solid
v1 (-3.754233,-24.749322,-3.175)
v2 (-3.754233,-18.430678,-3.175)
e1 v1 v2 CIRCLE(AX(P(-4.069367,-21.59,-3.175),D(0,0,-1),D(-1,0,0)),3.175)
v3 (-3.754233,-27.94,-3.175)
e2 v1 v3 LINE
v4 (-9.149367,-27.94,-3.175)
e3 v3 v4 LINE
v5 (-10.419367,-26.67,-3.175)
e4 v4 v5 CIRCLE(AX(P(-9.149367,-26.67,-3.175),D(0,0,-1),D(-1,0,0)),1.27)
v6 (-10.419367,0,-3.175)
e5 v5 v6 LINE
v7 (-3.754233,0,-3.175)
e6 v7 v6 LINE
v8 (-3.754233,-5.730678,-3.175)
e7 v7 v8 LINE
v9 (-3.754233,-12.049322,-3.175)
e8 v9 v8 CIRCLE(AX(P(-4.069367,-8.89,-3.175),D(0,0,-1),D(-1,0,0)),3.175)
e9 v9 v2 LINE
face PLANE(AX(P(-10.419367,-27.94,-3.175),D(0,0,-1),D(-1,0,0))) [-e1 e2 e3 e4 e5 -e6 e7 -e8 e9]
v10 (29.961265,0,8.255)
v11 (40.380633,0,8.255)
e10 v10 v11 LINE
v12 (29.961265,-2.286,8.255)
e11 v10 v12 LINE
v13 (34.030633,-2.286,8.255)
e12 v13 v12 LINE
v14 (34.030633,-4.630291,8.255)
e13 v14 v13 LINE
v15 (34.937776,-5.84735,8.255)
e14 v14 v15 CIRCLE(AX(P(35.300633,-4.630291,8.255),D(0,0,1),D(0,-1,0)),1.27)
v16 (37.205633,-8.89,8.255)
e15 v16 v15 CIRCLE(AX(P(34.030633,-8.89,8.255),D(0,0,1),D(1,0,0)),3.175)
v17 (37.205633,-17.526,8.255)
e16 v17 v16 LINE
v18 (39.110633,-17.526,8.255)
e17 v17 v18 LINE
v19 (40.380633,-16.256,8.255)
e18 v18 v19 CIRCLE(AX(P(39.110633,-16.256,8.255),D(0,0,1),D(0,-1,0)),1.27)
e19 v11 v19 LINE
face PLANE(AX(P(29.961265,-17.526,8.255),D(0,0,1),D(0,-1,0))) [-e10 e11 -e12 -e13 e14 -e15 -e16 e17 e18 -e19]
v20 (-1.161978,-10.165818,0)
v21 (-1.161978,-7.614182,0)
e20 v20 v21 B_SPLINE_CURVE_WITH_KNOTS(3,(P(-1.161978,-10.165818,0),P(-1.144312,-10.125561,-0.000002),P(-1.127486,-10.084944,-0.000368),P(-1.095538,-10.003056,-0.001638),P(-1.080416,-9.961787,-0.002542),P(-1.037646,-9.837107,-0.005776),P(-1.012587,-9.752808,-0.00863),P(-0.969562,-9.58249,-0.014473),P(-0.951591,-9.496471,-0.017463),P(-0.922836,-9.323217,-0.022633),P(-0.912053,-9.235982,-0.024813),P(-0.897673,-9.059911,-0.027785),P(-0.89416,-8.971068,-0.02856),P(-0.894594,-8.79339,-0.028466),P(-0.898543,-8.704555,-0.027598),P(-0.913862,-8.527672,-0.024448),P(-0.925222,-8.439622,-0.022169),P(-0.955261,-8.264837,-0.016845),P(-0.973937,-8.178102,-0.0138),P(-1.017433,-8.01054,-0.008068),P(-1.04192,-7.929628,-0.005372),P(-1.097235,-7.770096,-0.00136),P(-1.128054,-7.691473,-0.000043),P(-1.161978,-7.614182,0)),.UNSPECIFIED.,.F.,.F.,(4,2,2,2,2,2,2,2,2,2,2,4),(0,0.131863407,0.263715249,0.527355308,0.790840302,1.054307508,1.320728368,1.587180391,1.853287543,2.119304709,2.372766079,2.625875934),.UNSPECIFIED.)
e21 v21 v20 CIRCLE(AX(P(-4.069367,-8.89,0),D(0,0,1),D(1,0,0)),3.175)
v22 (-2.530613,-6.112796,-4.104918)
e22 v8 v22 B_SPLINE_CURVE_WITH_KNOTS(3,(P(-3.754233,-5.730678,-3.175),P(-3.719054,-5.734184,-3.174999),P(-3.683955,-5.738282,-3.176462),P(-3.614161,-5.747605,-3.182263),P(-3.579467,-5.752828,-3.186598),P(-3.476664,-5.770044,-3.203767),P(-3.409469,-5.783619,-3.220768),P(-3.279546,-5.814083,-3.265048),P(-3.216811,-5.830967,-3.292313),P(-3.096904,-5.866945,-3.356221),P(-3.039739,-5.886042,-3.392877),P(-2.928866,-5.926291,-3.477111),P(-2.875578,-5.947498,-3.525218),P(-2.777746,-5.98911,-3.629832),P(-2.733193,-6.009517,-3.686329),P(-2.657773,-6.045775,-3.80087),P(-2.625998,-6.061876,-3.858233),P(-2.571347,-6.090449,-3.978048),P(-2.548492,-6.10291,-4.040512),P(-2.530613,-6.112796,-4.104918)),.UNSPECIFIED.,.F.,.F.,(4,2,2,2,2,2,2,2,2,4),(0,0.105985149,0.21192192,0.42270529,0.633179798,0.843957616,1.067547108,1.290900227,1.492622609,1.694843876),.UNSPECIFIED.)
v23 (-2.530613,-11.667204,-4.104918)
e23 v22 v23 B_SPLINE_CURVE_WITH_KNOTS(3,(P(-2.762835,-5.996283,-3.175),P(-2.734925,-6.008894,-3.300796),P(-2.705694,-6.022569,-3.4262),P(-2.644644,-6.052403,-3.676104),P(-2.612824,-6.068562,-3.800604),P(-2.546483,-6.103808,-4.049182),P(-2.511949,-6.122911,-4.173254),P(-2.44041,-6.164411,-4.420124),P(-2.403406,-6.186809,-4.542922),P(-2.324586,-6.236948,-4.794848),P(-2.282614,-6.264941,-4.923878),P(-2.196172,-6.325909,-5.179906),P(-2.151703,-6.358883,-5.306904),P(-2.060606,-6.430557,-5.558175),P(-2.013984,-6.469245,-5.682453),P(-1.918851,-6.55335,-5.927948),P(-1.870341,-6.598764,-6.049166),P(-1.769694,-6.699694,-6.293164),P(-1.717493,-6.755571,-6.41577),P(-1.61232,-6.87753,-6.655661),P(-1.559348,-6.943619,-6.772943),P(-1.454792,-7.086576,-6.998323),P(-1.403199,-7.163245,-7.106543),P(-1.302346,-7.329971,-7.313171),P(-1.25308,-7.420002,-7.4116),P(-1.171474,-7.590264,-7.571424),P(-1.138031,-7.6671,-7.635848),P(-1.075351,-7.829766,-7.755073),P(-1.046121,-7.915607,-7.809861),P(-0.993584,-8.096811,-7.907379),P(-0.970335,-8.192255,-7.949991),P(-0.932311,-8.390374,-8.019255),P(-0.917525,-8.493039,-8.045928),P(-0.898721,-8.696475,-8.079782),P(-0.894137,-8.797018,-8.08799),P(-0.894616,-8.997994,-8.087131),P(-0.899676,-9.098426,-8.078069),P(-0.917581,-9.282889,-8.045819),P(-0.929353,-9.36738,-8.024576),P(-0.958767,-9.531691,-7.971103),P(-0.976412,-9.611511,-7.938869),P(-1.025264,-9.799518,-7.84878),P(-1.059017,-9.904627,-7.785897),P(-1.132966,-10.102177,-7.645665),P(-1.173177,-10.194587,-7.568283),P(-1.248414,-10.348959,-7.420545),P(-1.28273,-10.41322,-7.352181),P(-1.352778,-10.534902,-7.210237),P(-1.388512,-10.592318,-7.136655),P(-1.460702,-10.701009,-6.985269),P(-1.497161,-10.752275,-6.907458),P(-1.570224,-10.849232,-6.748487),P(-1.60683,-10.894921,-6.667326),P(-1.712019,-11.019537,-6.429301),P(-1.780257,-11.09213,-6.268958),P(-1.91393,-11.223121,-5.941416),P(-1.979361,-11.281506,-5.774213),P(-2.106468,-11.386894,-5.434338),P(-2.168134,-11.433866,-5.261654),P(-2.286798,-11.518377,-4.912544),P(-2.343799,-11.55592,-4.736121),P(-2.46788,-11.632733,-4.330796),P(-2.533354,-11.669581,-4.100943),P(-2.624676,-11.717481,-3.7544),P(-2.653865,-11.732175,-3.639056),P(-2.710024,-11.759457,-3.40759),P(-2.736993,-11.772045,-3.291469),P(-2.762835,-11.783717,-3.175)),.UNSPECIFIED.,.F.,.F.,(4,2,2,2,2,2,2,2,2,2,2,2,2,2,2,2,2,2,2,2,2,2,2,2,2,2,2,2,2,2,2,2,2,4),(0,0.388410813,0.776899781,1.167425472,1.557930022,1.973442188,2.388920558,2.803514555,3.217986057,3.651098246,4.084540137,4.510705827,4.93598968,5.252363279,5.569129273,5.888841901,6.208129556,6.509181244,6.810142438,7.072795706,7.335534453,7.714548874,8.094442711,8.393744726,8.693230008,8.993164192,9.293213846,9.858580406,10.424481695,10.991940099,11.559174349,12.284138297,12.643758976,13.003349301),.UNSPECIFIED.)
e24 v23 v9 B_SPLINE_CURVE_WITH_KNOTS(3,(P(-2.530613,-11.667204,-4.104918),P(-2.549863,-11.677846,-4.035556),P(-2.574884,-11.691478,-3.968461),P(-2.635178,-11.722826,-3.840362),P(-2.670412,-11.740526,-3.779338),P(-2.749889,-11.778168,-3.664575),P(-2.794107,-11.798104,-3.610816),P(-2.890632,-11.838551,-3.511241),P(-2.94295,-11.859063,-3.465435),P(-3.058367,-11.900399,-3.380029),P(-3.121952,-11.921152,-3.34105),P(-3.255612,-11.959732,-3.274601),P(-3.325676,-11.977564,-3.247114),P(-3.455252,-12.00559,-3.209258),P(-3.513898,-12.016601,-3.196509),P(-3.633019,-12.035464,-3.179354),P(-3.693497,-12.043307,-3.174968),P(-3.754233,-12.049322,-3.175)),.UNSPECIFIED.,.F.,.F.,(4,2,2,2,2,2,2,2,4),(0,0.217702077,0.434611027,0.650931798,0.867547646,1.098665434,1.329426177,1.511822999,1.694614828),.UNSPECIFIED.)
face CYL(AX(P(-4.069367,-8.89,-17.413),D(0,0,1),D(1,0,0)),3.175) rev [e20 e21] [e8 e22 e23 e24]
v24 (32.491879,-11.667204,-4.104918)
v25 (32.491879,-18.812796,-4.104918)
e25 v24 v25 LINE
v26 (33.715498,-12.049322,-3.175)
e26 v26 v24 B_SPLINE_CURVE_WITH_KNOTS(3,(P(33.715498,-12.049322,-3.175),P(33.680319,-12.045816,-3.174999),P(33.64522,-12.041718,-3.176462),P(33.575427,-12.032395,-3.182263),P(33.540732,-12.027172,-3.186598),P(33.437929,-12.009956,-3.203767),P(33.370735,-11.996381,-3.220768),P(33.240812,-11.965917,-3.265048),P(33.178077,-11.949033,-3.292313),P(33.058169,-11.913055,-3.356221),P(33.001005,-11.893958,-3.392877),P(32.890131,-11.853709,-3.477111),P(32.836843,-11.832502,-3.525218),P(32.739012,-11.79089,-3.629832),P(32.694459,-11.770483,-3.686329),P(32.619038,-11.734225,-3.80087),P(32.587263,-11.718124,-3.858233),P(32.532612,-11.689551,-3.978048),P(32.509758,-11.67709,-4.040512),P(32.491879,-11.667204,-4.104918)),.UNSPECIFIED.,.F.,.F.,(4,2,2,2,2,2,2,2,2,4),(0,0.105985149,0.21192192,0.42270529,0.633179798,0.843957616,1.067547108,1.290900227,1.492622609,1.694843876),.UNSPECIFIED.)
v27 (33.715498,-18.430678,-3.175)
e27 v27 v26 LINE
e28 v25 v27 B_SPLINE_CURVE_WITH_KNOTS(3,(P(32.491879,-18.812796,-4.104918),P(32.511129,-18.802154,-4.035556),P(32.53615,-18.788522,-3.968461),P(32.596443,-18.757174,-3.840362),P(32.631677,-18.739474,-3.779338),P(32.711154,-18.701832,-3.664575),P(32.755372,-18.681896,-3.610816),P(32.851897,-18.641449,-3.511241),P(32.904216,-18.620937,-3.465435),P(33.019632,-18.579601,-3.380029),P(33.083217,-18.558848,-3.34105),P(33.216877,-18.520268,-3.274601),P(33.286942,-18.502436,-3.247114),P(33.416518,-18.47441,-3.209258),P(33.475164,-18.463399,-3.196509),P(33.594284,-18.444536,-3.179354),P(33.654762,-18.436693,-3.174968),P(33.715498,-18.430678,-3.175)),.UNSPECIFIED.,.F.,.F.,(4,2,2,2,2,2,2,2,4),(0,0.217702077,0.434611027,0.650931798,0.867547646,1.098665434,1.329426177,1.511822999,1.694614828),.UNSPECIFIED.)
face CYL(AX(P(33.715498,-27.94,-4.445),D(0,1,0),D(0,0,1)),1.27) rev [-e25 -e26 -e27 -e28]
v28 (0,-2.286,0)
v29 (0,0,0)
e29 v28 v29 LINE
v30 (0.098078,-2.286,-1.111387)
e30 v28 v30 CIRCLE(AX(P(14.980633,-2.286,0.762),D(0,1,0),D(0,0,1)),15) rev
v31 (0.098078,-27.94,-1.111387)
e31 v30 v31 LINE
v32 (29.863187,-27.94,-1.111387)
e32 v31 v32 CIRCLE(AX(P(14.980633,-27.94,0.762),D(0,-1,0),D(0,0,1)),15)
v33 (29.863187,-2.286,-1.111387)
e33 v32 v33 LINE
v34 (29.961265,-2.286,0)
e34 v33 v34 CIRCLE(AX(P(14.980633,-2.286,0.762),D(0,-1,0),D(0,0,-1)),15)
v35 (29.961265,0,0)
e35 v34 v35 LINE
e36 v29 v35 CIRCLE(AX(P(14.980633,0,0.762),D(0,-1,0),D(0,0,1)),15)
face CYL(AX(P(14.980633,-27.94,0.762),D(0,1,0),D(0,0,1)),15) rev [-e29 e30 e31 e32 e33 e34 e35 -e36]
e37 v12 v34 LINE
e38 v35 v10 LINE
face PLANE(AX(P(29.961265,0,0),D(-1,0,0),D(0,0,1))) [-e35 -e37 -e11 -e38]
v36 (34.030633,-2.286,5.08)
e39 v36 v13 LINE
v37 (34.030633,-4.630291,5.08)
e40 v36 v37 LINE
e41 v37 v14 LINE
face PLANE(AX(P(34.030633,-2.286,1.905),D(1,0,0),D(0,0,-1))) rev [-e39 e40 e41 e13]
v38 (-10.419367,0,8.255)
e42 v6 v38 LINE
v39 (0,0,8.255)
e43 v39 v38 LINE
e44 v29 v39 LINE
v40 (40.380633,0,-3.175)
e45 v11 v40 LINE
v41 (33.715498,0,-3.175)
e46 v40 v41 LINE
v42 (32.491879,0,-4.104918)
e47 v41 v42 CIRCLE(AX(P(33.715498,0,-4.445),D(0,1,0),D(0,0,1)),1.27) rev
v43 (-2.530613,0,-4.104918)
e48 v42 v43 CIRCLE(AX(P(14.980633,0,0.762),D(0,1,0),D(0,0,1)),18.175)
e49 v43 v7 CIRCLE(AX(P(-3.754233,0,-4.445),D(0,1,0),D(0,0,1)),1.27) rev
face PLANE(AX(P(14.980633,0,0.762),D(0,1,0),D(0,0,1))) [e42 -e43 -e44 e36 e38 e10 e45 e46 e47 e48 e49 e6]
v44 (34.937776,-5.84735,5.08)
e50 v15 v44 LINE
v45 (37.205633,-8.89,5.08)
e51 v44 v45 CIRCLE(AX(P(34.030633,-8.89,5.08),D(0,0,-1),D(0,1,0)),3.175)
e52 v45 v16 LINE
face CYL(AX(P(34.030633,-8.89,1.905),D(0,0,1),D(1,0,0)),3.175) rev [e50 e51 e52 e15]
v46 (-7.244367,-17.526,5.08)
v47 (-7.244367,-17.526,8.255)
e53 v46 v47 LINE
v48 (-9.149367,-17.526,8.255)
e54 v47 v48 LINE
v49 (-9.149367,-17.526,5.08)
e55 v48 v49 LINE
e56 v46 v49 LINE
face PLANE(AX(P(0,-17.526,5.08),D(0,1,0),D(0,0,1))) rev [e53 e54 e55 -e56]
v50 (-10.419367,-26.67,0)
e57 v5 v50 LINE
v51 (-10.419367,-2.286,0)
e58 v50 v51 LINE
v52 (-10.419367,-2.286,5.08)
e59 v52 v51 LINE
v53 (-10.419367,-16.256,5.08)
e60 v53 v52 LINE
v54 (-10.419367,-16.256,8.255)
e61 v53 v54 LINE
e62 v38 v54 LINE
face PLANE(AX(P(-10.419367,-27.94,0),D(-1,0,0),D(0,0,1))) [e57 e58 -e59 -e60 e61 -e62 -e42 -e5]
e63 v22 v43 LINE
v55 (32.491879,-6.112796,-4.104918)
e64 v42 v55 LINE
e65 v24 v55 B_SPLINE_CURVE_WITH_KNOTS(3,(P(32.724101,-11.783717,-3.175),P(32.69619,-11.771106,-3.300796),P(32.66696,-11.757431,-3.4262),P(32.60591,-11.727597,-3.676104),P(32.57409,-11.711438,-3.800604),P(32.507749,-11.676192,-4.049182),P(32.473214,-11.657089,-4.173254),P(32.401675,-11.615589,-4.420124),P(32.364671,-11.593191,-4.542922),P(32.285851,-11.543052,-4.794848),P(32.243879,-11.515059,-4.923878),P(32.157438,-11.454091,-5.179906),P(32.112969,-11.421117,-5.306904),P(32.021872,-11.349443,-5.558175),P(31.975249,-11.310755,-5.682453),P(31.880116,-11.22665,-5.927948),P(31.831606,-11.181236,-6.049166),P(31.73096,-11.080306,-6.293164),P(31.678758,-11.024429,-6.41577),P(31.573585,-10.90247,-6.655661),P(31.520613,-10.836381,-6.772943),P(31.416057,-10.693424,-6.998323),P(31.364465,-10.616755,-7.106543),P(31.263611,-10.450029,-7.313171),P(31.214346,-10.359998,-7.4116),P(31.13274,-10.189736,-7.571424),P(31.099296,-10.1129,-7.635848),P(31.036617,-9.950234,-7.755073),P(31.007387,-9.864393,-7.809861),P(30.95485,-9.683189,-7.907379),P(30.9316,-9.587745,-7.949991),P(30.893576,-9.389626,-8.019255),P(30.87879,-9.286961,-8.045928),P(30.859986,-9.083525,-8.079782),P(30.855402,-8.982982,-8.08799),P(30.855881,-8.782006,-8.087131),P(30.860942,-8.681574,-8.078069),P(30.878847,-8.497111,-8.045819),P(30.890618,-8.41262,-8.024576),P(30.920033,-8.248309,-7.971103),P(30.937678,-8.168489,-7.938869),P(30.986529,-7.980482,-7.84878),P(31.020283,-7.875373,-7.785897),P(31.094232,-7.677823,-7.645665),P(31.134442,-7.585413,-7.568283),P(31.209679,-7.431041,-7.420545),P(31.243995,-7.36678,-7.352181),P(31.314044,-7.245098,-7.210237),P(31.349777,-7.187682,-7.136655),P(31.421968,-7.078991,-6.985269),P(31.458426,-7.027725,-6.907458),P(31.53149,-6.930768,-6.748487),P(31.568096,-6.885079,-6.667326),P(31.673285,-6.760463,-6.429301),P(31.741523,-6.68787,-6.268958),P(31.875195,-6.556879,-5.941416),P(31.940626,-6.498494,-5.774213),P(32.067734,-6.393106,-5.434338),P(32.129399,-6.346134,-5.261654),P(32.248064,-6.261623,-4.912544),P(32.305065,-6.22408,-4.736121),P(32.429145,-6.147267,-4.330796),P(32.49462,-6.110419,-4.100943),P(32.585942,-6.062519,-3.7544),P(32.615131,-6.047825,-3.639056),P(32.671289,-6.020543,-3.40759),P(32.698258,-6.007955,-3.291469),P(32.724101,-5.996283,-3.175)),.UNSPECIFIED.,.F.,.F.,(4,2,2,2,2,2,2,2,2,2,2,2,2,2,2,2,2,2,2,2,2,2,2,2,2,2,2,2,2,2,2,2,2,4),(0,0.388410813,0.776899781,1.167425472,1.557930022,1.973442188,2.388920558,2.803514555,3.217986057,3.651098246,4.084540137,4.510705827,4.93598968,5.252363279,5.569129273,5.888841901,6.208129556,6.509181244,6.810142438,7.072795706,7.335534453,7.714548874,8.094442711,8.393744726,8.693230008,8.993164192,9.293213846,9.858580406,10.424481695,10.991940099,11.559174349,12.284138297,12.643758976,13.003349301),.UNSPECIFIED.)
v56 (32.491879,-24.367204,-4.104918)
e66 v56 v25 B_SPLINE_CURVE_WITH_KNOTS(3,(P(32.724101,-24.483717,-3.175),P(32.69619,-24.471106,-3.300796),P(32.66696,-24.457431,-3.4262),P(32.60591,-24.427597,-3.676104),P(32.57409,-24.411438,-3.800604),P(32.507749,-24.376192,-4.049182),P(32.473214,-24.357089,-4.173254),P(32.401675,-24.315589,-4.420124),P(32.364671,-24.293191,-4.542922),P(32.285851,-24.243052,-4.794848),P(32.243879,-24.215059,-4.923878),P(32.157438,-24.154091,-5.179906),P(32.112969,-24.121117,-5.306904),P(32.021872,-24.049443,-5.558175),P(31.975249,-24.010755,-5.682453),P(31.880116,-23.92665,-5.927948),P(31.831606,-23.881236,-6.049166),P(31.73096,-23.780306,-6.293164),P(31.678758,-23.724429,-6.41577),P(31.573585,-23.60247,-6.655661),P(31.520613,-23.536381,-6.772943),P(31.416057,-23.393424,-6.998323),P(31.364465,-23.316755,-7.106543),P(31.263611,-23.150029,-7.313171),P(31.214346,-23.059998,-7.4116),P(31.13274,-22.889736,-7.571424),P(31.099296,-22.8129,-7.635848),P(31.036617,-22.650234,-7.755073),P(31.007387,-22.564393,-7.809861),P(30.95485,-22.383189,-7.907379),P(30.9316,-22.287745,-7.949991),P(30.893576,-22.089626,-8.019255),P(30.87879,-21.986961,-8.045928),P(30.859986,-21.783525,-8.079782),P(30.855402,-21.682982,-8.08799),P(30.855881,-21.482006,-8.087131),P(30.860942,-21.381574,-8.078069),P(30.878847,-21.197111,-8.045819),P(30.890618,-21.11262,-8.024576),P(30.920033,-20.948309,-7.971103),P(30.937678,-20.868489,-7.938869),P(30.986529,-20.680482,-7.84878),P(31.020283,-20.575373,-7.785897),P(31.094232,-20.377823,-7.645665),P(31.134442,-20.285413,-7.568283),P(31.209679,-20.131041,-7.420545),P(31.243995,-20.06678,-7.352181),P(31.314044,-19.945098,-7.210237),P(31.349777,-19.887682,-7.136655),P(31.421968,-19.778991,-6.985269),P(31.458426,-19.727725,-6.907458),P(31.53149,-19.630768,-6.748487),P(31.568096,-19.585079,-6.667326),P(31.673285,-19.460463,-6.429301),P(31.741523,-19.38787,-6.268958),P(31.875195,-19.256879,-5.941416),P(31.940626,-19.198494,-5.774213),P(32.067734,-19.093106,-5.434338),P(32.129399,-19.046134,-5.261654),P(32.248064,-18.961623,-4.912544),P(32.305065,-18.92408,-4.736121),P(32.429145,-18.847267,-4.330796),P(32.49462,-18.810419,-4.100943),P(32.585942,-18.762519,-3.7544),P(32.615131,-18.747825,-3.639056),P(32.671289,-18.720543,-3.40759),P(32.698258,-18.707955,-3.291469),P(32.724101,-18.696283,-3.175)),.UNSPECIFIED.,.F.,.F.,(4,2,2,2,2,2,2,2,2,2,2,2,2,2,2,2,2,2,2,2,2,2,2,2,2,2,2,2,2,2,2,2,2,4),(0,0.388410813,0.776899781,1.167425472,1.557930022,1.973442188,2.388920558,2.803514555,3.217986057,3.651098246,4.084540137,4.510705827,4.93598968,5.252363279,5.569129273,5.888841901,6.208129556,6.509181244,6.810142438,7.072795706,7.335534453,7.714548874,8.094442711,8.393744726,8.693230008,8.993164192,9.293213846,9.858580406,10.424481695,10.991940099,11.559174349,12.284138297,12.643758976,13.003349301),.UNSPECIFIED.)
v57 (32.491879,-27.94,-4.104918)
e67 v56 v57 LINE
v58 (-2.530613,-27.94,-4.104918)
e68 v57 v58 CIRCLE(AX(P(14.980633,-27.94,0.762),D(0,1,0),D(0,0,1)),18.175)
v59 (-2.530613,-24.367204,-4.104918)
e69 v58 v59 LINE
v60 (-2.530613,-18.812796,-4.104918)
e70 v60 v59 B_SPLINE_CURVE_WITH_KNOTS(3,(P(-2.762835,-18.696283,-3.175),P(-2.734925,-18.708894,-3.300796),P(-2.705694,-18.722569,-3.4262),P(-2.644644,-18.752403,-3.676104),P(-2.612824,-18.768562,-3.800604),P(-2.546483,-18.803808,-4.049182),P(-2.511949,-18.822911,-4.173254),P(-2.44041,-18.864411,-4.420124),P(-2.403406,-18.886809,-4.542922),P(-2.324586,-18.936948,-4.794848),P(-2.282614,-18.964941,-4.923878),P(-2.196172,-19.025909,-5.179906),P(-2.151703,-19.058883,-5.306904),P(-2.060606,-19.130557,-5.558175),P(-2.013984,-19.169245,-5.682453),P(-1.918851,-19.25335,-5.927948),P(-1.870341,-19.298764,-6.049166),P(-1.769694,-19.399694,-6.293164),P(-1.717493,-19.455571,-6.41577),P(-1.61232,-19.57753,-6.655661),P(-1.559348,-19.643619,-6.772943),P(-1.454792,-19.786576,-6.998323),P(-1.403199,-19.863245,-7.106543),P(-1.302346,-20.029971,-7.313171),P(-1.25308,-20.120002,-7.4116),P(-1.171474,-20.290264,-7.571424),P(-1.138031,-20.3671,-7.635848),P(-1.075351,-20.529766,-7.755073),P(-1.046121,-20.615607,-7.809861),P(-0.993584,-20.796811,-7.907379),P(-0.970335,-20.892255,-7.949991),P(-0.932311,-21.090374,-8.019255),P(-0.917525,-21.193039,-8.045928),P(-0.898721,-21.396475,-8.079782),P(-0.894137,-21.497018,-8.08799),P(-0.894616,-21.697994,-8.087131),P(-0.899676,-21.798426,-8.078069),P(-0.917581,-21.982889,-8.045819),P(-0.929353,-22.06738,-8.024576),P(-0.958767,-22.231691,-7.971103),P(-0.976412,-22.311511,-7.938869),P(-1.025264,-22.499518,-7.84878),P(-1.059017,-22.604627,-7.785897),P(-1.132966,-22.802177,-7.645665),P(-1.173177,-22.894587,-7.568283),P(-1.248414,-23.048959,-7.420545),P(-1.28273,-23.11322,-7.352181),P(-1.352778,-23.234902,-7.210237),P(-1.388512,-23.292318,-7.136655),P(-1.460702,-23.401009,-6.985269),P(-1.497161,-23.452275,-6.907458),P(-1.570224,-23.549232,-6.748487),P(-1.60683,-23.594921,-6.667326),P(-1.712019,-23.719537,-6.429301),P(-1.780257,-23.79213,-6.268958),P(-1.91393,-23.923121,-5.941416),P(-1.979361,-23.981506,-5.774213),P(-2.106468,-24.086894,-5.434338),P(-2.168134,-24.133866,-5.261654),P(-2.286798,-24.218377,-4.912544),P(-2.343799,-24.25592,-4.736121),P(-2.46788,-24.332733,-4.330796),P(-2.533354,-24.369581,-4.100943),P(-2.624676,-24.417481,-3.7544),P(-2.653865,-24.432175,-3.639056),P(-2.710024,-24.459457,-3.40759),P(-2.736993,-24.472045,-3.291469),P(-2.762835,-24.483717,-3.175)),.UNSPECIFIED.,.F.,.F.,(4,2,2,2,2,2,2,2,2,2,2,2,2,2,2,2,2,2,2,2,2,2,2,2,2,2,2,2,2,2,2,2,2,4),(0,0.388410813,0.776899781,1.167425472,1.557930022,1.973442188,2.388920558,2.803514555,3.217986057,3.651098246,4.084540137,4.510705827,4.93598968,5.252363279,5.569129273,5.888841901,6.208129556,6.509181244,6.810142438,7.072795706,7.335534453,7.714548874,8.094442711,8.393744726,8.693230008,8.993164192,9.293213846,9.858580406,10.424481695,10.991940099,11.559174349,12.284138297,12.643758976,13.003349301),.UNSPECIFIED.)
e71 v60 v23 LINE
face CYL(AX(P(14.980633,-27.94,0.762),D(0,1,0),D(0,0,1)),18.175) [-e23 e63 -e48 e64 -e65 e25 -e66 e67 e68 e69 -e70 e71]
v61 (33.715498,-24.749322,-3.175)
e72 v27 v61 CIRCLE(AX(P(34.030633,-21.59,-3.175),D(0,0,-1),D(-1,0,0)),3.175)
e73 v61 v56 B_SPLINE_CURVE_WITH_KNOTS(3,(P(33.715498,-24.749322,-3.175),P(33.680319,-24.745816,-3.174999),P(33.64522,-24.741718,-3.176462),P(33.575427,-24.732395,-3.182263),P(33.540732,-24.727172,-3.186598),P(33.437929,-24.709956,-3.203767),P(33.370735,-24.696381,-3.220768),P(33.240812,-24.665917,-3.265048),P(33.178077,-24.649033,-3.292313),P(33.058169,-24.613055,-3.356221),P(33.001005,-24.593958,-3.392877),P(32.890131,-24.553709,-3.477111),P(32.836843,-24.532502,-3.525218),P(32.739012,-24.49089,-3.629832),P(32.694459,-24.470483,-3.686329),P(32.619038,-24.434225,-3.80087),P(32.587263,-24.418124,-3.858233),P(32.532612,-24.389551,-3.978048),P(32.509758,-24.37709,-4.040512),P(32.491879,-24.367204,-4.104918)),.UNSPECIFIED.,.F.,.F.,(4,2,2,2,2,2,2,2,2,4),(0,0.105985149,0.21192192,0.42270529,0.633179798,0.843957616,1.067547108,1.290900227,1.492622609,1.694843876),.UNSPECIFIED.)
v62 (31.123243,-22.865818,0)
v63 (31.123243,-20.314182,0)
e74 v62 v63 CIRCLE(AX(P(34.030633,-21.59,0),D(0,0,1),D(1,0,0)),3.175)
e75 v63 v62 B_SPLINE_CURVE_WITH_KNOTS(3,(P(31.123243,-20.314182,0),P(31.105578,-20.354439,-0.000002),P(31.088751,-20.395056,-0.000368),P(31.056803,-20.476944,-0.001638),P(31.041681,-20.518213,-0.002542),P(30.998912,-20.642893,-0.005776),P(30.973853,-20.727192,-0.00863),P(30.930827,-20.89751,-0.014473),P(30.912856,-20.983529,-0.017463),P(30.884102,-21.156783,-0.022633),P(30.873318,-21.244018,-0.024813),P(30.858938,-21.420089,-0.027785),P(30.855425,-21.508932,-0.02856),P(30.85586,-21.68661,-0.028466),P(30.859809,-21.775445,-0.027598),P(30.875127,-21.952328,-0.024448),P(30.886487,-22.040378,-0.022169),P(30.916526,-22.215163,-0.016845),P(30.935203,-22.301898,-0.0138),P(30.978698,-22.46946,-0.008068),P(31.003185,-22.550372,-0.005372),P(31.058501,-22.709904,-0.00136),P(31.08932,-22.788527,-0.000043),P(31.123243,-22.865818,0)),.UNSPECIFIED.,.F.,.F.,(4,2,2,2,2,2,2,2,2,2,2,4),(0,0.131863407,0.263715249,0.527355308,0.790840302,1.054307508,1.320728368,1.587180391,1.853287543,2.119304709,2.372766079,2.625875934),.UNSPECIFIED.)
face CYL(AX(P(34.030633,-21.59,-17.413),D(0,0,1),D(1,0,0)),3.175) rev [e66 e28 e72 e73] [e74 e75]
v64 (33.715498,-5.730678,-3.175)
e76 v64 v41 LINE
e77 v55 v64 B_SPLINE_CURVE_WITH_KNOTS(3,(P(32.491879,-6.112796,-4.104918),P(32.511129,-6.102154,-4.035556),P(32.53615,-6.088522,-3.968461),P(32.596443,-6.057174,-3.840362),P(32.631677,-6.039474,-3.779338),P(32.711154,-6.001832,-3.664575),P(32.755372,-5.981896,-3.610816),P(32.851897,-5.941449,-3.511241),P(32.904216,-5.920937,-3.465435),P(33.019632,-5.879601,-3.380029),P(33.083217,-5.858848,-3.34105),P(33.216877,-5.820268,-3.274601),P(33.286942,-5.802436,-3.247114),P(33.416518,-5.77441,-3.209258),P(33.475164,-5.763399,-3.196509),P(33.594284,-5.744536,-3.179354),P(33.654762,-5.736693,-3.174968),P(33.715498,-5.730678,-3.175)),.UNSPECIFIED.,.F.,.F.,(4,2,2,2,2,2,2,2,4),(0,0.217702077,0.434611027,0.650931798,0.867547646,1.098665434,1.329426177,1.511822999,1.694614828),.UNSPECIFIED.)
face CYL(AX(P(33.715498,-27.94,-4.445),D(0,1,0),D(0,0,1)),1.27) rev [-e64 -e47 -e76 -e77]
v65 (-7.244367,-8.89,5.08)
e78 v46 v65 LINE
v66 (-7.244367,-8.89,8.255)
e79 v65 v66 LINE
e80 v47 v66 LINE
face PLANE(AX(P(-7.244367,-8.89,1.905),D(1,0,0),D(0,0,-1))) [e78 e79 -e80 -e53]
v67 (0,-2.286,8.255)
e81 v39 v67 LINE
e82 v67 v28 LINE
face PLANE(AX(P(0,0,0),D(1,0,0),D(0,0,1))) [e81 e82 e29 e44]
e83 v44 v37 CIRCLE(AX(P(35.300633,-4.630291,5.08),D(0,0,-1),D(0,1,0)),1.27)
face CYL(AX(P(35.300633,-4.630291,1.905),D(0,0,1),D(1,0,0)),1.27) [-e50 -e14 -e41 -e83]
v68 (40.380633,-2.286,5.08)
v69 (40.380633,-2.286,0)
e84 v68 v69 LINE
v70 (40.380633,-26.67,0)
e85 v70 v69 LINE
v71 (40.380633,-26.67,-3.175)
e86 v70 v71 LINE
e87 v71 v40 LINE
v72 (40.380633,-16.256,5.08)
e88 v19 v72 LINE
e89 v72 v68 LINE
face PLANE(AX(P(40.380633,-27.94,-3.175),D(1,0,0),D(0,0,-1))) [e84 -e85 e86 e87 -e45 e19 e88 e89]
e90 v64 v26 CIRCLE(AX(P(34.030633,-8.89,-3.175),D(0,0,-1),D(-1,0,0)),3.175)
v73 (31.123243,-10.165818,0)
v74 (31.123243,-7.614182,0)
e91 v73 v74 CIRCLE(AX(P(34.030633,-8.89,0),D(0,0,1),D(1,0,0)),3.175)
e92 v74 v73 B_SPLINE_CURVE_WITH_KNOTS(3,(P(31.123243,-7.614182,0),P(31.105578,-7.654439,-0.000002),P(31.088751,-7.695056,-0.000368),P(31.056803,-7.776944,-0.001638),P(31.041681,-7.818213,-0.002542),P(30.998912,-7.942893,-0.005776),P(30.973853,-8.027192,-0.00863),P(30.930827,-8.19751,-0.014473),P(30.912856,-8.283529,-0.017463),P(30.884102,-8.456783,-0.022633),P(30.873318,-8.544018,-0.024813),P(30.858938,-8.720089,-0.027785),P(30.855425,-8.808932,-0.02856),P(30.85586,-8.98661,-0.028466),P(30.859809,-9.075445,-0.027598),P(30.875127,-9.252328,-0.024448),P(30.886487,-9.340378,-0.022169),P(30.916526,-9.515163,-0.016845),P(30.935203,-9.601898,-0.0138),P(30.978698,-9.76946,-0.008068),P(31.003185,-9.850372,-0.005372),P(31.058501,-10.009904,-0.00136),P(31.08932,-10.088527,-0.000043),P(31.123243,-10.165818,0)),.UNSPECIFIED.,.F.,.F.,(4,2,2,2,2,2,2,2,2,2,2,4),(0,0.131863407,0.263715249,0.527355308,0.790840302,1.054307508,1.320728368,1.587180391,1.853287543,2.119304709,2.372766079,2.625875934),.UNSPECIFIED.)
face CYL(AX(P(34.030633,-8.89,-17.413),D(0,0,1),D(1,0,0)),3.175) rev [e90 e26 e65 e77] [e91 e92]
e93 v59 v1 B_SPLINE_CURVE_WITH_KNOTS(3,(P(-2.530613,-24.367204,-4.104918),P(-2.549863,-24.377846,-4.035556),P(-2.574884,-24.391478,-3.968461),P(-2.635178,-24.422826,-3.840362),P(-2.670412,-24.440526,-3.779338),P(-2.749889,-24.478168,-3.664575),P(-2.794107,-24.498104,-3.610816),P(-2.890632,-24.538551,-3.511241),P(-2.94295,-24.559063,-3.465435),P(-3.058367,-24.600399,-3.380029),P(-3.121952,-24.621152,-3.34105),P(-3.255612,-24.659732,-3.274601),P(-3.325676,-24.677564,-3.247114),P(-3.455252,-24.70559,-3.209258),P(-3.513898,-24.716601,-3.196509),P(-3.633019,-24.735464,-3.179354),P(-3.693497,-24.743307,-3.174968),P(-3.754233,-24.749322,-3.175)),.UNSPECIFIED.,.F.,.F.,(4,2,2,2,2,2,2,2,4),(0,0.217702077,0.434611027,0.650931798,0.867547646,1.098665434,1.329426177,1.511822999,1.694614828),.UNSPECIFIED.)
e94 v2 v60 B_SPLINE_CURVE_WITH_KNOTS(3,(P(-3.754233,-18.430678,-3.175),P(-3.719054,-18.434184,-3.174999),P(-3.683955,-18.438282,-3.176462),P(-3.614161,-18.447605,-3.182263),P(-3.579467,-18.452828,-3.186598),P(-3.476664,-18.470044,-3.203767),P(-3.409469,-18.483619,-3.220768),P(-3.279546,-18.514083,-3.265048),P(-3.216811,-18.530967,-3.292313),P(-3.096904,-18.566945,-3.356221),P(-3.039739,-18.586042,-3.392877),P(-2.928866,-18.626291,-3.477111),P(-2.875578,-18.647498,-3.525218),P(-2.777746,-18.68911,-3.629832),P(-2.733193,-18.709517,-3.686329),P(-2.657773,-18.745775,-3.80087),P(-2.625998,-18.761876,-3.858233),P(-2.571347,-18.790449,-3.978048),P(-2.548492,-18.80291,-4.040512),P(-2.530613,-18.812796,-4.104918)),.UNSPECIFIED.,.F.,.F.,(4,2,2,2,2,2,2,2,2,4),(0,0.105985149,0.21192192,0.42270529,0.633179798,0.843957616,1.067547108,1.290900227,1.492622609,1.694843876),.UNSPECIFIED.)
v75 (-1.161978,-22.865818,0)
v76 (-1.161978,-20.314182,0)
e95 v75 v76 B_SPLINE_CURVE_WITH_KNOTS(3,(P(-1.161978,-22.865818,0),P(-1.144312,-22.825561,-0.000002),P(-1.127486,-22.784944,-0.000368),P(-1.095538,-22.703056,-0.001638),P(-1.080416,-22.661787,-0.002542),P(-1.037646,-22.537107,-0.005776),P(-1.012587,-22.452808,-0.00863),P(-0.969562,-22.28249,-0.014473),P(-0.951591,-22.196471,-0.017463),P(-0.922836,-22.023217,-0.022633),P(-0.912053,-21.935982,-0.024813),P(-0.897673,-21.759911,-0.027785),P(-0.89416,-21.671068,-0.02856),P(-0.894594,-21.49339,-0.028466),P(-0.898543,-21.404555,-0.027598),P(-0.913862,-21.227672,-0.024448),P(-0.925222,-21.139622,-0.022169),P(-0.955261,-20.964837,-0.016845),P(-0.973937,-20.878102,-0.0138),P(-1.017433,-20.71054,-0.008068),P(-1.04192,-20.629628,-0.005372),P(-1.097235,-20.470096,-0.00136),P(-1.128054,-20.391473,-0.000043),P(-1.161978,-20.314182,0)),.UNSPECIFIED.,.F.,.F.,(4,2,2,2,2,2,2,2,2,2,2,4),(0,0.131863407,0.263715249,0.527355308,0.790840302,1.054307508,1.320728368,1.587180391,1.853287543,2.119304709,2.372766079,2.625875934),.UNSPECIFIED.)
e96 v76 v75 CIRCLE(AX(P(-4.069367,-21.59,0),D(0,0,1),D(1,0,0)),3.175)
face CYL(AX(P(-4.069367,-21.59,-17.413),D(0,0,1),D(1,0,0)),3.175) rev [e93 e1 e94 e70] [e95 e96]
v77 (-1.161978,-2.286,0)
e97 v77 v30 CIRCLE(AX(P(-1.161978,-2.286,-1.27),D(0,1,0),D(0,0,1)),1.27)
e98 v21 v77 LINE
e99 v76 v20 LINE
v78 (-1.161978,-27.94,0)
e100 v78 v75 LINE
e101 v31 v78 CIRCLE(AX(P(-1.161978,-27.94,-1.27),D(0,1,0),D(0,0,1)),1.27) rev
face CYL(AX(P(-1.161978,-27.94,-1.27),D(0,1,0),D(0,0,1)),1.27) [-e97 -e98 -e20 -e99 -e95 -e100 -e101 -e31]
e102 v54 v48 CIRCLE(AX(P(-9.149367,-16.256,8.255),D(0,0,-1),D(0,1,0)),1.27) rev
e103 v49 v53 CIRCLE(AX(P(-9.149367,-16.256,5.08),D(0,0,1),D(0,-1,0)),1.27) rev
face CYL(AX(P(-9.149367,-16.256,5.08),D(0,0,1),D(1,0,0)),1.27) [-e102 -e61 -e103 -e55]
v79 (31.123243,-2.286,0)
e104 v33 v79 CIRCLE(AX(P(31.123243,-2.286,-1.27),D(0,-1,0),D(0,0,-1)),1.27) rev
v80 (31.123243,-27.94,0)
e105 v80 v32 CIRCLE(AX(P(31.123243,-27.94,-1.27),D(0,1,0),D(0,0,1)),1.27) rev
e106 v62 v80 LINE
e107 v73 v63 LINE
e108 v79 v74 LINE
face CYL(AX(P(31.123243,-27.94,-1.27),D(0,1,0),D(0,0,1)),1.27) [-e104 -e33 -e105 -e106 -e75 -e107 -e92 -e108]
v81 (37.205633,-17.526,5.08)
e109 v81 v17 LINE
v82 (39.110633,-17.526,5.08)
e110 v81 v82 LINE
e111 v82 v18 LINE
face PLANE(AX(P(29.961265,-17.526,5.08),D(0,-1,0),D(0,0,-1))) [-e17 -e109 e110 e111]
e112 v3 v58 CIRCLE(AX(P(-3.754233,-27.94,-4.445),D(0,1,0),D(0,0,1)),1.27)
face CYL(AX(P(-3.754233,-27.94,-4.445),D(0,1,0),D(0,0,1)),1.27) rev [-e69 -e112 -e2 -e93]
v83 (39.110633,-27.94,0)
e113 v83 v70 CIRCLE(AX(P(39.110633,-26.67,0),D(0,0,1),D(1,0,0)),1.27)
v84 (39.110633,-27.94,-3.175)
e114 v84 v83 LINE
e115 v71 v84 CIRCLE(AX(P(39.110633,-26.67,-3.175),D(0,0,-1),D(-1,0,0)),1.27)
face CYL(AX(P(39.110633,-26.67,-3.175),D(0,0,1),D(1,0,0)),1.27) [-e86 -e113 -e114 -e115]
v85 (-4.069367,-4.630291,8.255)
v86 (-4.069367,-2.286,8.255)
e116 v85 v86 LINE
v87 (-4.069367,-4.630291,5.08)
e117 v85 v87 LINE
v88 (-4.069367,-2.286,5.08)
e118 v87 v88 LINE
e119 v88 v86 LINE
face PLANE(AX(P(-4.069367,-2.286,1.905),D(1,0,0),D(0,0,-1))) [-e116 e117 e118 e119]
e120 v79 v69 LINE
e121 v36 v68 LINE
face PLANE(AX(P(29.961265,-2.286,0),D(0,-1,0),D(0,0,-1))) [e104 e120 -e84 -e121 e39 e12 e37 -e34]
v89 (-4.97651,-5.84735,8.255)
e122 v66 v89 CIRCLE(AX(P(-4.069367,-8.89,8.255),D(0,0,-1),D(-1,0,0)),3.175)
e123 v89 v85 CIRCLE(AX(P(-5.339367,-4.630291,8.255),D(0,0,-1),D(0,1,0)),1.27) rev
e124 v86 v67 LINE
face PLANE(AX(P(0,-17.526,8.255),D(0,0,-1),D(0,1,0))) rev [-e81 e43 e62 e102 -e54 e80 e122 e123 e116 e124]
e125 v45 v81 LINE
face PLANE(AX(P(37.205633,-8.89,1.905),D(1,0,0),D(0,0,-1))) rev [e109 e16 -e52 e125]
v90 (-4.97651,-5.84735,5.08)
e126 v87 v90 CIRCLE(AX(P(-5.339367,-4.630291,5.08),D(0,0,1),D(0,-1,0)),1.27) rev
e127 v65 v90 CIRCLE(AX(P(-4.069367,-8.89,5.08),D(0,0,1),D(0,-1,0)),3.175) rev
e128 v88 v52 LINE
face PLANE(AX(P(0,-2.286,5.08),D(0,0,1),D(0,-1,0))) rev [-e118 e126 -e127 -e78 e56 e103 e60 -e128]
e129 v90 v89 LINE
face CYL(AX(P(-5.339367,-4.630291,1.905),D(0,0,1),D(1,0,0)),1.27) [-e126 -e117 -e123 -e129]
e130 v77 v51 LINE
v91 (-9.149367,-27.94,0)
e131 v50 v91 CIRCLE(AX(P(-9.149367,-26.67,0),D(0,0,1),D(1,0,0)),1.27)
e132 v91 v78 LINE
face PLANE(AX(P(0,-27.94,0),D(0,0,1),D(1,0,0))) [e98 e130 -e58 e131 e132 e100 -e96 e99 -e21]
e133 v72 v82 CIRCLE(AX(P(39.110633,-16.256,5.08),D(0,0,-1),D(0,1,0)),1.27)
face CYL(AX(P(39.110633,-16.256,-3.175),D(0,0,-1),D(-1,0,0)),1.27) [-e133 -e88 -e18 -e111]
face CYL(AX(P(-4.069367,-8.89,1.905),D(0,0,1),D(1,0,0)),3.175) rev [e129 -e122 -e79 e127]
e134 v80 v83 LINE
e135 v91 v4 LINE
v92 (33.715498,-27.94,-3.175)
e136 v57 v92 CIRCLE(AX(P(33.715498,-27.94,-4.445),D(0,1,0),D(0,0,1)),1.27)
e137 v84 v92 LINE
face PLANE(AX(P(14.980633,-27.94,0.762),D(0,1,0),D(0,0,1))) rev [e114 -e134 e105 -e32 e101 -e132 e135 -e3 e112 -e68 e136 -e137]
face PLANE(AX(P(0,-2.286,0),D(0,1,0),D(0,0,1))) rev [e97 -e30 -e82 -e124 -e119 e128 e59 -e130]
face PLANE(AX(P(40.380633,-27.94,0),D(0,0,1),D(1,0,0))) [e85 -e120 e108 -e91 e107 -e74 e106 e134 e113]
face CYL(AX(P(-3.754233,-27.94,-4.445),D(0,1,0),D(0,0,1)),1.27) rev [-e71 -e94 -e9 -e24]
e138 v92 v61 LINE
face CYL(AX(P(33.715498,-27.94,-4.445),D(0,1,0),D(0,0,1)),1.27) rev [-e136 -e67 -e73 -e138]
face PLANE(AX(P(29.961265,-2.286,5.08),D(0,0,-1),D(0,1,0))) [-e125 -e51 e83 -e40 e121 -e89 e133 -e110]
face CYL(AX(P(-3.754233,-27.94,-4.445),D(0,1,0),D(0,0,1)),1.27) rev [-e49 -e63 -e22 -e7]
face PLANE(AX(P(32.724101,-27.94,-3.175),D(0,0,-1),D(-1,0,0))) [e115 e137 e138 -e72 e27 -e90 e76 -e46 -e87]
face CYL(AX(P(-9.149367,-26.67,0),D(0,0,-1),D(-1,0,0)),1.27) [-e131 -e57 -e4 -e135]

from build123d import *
from OCP.BRepAlgoAPI import BRepAlgoAPI_Cut
from OCP.TopTools import TopTools_ListOfShape

# Parameters (mm, degrees)
BOSS_EXTRUDE1_DEPTH = 27.94
SKETCH3_R           = 3.175
CUT_EXTRUDE1_DEPTH  = 53.100399864
BOSS_EXTRUDE2_START = -10.419367
BOSS_EXTRUDE2_DEPTH = 10.419367
CUT_EXTRUDE2_DEPTH  = 6.35
FILLET1_R           = 1.27


with BuildPart() as part:
    # Sketch2 → Boss-Extrude1 (new body)
    with BuildSketch(Plane(origin=(0, 0, 0), x_dir=(1, 0, 0), z_dir=(0, 1, 0))):
        with BuildLine():
            Line((0, 0), (-10.419367303, 0))
            Line((-10.419367303, 0), (-10.419367303, 3.175))
            Line((-10.419367303, 3.175), (-2.762835284, 3.175))
            ThreePointArc((-2.762835284, 3.175), (14.980632697, 17.413), (32.724100678, 3.175))
            Line((32.724100678, 3.175), (40.380632697, 3.175))
            Line((40.380632697, 3.175), (40.380632697, 0))
            Line((40.380632697, 0), (29.961265394, 0))
            ThreePointArc((29.961265394, 0), (14.980632697, 14.238), (0, 0))
        make_face()
    extrude(amount=-BOSS_EXTRUDE1_DEPTH)

    # Sketch3 → Cut-Extrude1 (cut, through all)
    with BuildSketch(Plane.XY):
        with Locations((-4.069367303, -8.89)):
            Circle(SKETCH3_R)
        with Locations((34.030632697, -8.89)):
            Circle(SKETCH3_R)
        with Locations((-4.069367303, -21.59)):
            Circle(SKETCH3_R)
        with Locations((34.030632697, -21.59)):
            Circle(SKETCH3_R)
    extrude(amount=-CUT_EXTRUDE1_DEPTH, mode=Mode.SUBTRACT)

    # Sketch4 → Boss-Extrude2 (add)
    with BuildSketch(Plane(origin=(40.380632697, 0, 0), x_dir=(0, 0, -1), z_dir=(1, 0, 0)).offset(BOSS_EXTRUDE2_START)):
        Polygon((-5.08, -17.526), (-8.255, -17.526), (-8.255, 0), (0, 0), (0, -2.286), (-5.08, -2.286), align=None)
    boss_extrude2 = extrude(amount=BOSS_EXTRUDE2_DEPTH)


with BuildPart() as cut_extrude2_tool:
    # Sketch5 → Cut-Extrude2 (new body)
    with BuildSketch(Plane.XY.offset(8.255)):
        with BuildLine():
            Line((37.205632697, -8.89), (37.205632697, -17.526))
            Line((37.205632697, -17.526), (29.961265394, -17.526))
            Line((29.961265394, -17.526), (29.961265394, -2.286))
            Line((29.961265394, -2.286), (34.030632697, -2.286))
            Line((34.030632697, -2.286), (34.030632697, -5.715))
            ThreePointArc((34.030632697, -5.715), (36.275696727, -6.64493597), (37.205632697, -8.89))
        make_face()
    cut_extrude2 = extrude(amount=-CUT_EXTRUDE2_DEPTH)


with BuildPart() as part_1:
    add(part.part)

    # Cut-Extrude2: cut by cut_extrude2_tool, with a tolerance
    cut_extrude2_stock = TopTools_ListOfShape()
    cut_extrude2_stock.Append(part_1.part.wrapped)
    cut_extrude2_tools = TopTools_ListOfShape()
    cut_extrude2_tools.Append(cut_extrude2_tool.part.wrapped)
    cut_extrude2_cut = BRepAlgoAPI_Cut()
    cut_extrude2_cut.SetArguments(cut_extrude2_stock)
    cut_extrude2_cut.SetTools(cut_extrude2_tools)
    cut_extrude2_cut.SetFuzzyValue(0.00001)
    cut_extrude2_cut.Build()
    add(Compound.cast(cut_extrude2_cut.Shape()).solids(), mode=Mode.REPLACE)

    # Mirror1: Boss-Extrude2, Cut-Extrude2 across plane
    add(boss_extrude2.mirror(Plane.ZY.offset(-14.980632697)))
    add(cut_extrude2.mirror(Plane.ZY.offset(-14.980632697)), mode=Mode.SUBTRACT)

    # Fillet1
    # the kernel refuses this fillet: 1.27 mm, written as the material it adds along each edge
    with BuildSketch(Plane(origin=(32.724100678, 0, -3.175), x_dir=(1, 0, 0), z_dir=(0, -1, 0))) as fillet1_piece_1_section:
        with BuildLine():
            CenterArc((0.991397271, -1.27), FILLET1_R, 90, 74.467738735)
            ThreePointArc((-0.232222111, -0.929918231), (-0.109979978, -0.466490187), (0, 0))
            Line((0, 0), (0.991397271, 0))
        make_face()
    fillet1_piece_1 = extrude(amount=8.474776002, mode=Mode.PRIVATE)
    fillet1_piece_1 = fillet1_piece_1 - Plane(origin=(34.030632697, -8.89, -3.175), x_dir=(1, 0, 0), z_dir=(0, 0, 1)) * Cylinder(3.175, 21, mode=Mode.PRIVATE)
    add(fillet1_piece_1)
    with BuildSketch(Plane(origin=(32.724100678, -22.005223998, -3.175), x_dir=(1, 0, 0), z_dir=(0, -1, 0))) as fillet1_piece_2_section:
        with BuildLine():
            CenterArc((0.991397271, -1.27), FILLET1_R, 90, 74.467738735)
            ThreePointArc((-0.232222111, -0.929918231), (-0.109979978, -0.466490187), (0, 0))
            Line((0, 0), (0.991397271, 0))
        make_face()
    fillet1_piece_2 = extrude(amount=5.934776002, mode=Mode.PRIVATE)
    fillet1_piece_2 = fillet1_piece_2 - Plane(origin=(34.030632697, -21.59, -3.175), x_dir=(1, 0, 0), z_dir=(0, 0, 1)) * Cylinder(3.175, 16, mode=Mode.PRIVATE)
    add(fillet1_piece_2)
    with BuildSketch(Plane(origin=(32.724100678, -9.305223998, -3.175), x_dir=(1, 0, 0), z_dir=(0, -1, 0))) as fillet1_piece_3_section:
        with BuildLine():
            CenterArc((0.991397271, -1.27), FILLET1_R, 90, 74.467738735)
            ThreePointArc((-0.232222111, -0.929918231), (-0.109979978, -0.466490187), (0, 0))
            Line((0, 0), (0.991397271, 0))
        make_face()
    fillet1_piece_3 = extrude(amount=11.869552004, mode=Mode.PRIVATE)
    fillet1_piece_3 = fillet1_piece_3 - Plane(origin=(34.030632697, -21.59, -3.175), x_dir=(1, 0, 0), z_dir=(0, 0, 1)) * Cylinder(3.175, 28, mode=Mode.PRIVATE)
    fillet1_piece_3 = fillet1_piece_3 - Plane(origin=(34.030632697, -8.89, -3.175), x_dir=(1, 0, 0), z_dir=(0, 0, 1)) * Cylinder(3.175, 28, mode=Mode.PRIVATE)
    add(fillet1_piece_3)
    with BuildSketch(Plane(origin=(-2.762835284, 0, -3.175), x_dir=(0.24228281636804117, 0, -0.9702056673163532), z_dir=(0, -1, 0))) as fillet1_piece_4_section:
        with BuildLine():
            CenterArc((0.991962675, -1.269558427), FILLET1_R, 91.510947972, 74.467738735)
            Line((-0.240198523, -0.96185925), (0, 0))
            ThreePointArc((0, 0), (0.479237682, -0.006319359), (0.958475365, 0))
        make_face()
    fillet1_piece_4 = extrude(amount=8.474776002, mode=Mode.PRIVATE)
    fillet1_piece_4 = fillet1_piece_4 - Plane(origin=(-4.069367303, -8.89, -3.175), x_dir=(1, 0, 0), z_dir=(0, 0, 1)) * Cylinder(3.175, 21, mode=Mode.PRIVATE)
    add(fillet1_piece_4)
    with BuildSketch(Plane(origin=(-2.762835284, -22.005223998, -3.175), x_dir=(0.24228281636804117, 0, -0.9702056673163532), z_dir=(0, -1, 0))) as fillet1_piece_5_section:
        with BuildLine():
            CenterArc((0.991962675, -1.269558427), FILLET1_R, 91.510947972, 74.467738735)
            Line((-0.240198523, -0.96185925), (0, 0))
            ThreePointArc((0, 0), (0.479237682, -0.006319359), (0.958475365, 0))
        make_face()
    fillet1_piece_5 = extrude(amount=5.934776002, mode=Mode.PRIVATE)
    fillet1_piece_5 = fillet1_piece_5 - Plane(origin=(-4.069367303, -21.59, -3.175), x_dir=(1, 0, 0), z_dir=(0, 0, 1)) * Cylinder(3.175, 16, mode=Mode.PRIVATE)
    add(fillet1_piece_5)
    with BuildSketch(Plane(origin=(-2.762835284, -9.305223998, -3.175), x_dir=(0.24228281636804117, 0, -0.9702056673163532), z_dir=(0, -1, 0))) as fillet1_piece_6_section:
        with BuildLine():
            CenterArc((0.991962675, -1.269558427), FILLET1_R, 91.510947972, 74.467738735)
            Line((-0.240198523, -0.96185925), (0, 0))
            ThreePointArc((0, 0), (0.479237682, -0.006319359), (0.958475365, 0))
        make_face()
    fillet1_piece_6 = extrude(amount=11.869552004, mode=Mode.PRIVATE)
    fillet1_piece_6 = fillet1_piece_6 - Plane(origin=(-4.069367303, -21.59, -3.175), x_dir=(1, 0, 0), z_dir=(0, 0, 1)) * Cylinder(3.175, 28, mode=Mode.PRIVATE)
    fillet1_piece_6 = fillet1_piece_6 - Plane(origin=(-4.069367303, -8.89, -3.175), x_dir=(1, 0, 0), z_dir=(0, 0, 1)) * Cylinder(3.175, 28, mode=Mode.PRIVATE)
    add(fillet1_piece_6)
    # the kernel refuses this fillet: 1.27 mm, written as the material it takes off along each edge
    with BuildSketch(Plane(origin=(29.961265394, 2.904944682, 0), x_dir=(-0.08790703364756058, 0, -0.9961286831706467), z_dir=(0, -1, 0))) as fillet1_2_piece_1_section:
        with BuildLine():
            CenterArc((1.1629374, 1.269121421), FILLET1_R, 185.043211655, 82.825455624)
            Line((-0.102146028, 1.157479488), (0, 0))
            ThreePointArc((0, 0), (0.557852926, 0.010376919), (1.115705852, 0))
        make_face()
    fillet1_2_piece_1 = extrude(amount=33.749889363, mode=Mode.PRIVATE)
    fillet1_2_piece_1 = split(fillet1_2_piece_1, bisect_by=Plane(origin=(29.961265394, -2.286, 0), z_dir=(0, -1, 0)), keep=Keep.TOP, mode=Mode.PRIVATE)
    add(fillet1_2_piece_1, mode=Mode.SUBTRACT)
    with BuildSketch(Plane(origin=(0, 2.904944682, 0), x_dir=(-1, 0, 0), z_dir=(0, -1, 0))) as fillet1_2_piece_2_section:
        with BuildLine():
            CenterArc((1.161977873, 1.27), FILLET1_R, 187.174544376, 82.825455624)
            ThreePointArc((-0.098078392, 1.111386601), (-0.038702449, 0.556605505), (0, 0))
            Line((0, 0), (1.161977873, 0))
        make_face()
    fillet1_2_piece_2 = extrude(amount=33.749889363, mode=Mode.PRIVATE)
    fillet1_2_piece_2 = split(fillet1_2_piece_2, bisect_by=Plane(origin=(0, -2.286, 0), z_dir=(0, -1, 0)), keep=Keep.TOP, mode=Mode.PRIVATE)
    add(fillet1_2_piece_2, mode=Mode.SUBTRACT)
    with BuildSketch(Plane(origin=(-10.419367303, -17.526, 1.905), x_dir=(0, 1, 0), z_dir=(0, 0, 1)), Plane(origin=(40.380632697, -27.94, -6.35), x_dir=(-1, 0, 0), z_dir=(0, 0, 1)), Plane(origin=(40.380632697, -17.526, 1.905), x_dir=(-1, 0, 0), z_dir=(0, 0, 1))) as fillet1_2_piece_3:
        with BuildLine():
            CenterArc((FILLET1_R, -FILLET1_R), FILLET1_R, 90, 90)
            Line((0, -FILLET1_R), (0, 0))
            Line((0, 0), (FILLET1_R, 0))
        make_face()
    extrude(amount=9.525, mode=Mode.SUBTRACT)
    with BuildSketch(Plane(origin=(-10.419367303, -27.94, 3.175), x_dir=(0, 1, 0), z_dir=(0, 0, -1))) as fillet1_2_piece_4:
        with BuildLine():
            CenterArc((FILLET1_R, FILLET1_R), FILLET1_R, 180, 90)
            Line((0, FILLET1_R), (0, 0))
            Line((0, 0), (FILLET1_R, 0))
        make_face()
    extrude(amount=9.525, mode=Mode.SUBTRACT)
    with BuildSketch(Plane(origin=(34.030632697, -5.715, 10.966773743), x_dir=(0, 1, 0), z_dir=(0, 0, -1))) as fillet1_2_piece_5:
        with BuildLine():
            CenterArc((1.084709497, 1.27), FILLET1_R, 196.601549599, 73.398450401)
            ThreePointArc((-0.132350359, 0.907142857), (-0.033261818, 0.458373423), (0, 0))
            Line((0, 0), (1.084709497, 0))
        make_face()
    extrude(amount=8.598547486, mode=Mode.SUBTRACT)
    with BuildSketch(Plane(origin=(-4.069367303, -5.715, 10.966773743), x_dir=(0, 1, 0), z_dir=(0, 0, -1))) as fillet1_2_piece_6:
        with BuildLine():
            CenterArc((1.084709497, -1.27), FILLET1_R, 90, 73.398450401)
            ThreePointArc((-0.132350359, -0.907142857), (-0.033261818, -0.458373423), (0, 0))
            Line((0, 0), (1.084709497, 0))
        make_face()
    extrude(amount=8.598547486, mode=Mode.SUBTRACT)


solid = part_1.part
